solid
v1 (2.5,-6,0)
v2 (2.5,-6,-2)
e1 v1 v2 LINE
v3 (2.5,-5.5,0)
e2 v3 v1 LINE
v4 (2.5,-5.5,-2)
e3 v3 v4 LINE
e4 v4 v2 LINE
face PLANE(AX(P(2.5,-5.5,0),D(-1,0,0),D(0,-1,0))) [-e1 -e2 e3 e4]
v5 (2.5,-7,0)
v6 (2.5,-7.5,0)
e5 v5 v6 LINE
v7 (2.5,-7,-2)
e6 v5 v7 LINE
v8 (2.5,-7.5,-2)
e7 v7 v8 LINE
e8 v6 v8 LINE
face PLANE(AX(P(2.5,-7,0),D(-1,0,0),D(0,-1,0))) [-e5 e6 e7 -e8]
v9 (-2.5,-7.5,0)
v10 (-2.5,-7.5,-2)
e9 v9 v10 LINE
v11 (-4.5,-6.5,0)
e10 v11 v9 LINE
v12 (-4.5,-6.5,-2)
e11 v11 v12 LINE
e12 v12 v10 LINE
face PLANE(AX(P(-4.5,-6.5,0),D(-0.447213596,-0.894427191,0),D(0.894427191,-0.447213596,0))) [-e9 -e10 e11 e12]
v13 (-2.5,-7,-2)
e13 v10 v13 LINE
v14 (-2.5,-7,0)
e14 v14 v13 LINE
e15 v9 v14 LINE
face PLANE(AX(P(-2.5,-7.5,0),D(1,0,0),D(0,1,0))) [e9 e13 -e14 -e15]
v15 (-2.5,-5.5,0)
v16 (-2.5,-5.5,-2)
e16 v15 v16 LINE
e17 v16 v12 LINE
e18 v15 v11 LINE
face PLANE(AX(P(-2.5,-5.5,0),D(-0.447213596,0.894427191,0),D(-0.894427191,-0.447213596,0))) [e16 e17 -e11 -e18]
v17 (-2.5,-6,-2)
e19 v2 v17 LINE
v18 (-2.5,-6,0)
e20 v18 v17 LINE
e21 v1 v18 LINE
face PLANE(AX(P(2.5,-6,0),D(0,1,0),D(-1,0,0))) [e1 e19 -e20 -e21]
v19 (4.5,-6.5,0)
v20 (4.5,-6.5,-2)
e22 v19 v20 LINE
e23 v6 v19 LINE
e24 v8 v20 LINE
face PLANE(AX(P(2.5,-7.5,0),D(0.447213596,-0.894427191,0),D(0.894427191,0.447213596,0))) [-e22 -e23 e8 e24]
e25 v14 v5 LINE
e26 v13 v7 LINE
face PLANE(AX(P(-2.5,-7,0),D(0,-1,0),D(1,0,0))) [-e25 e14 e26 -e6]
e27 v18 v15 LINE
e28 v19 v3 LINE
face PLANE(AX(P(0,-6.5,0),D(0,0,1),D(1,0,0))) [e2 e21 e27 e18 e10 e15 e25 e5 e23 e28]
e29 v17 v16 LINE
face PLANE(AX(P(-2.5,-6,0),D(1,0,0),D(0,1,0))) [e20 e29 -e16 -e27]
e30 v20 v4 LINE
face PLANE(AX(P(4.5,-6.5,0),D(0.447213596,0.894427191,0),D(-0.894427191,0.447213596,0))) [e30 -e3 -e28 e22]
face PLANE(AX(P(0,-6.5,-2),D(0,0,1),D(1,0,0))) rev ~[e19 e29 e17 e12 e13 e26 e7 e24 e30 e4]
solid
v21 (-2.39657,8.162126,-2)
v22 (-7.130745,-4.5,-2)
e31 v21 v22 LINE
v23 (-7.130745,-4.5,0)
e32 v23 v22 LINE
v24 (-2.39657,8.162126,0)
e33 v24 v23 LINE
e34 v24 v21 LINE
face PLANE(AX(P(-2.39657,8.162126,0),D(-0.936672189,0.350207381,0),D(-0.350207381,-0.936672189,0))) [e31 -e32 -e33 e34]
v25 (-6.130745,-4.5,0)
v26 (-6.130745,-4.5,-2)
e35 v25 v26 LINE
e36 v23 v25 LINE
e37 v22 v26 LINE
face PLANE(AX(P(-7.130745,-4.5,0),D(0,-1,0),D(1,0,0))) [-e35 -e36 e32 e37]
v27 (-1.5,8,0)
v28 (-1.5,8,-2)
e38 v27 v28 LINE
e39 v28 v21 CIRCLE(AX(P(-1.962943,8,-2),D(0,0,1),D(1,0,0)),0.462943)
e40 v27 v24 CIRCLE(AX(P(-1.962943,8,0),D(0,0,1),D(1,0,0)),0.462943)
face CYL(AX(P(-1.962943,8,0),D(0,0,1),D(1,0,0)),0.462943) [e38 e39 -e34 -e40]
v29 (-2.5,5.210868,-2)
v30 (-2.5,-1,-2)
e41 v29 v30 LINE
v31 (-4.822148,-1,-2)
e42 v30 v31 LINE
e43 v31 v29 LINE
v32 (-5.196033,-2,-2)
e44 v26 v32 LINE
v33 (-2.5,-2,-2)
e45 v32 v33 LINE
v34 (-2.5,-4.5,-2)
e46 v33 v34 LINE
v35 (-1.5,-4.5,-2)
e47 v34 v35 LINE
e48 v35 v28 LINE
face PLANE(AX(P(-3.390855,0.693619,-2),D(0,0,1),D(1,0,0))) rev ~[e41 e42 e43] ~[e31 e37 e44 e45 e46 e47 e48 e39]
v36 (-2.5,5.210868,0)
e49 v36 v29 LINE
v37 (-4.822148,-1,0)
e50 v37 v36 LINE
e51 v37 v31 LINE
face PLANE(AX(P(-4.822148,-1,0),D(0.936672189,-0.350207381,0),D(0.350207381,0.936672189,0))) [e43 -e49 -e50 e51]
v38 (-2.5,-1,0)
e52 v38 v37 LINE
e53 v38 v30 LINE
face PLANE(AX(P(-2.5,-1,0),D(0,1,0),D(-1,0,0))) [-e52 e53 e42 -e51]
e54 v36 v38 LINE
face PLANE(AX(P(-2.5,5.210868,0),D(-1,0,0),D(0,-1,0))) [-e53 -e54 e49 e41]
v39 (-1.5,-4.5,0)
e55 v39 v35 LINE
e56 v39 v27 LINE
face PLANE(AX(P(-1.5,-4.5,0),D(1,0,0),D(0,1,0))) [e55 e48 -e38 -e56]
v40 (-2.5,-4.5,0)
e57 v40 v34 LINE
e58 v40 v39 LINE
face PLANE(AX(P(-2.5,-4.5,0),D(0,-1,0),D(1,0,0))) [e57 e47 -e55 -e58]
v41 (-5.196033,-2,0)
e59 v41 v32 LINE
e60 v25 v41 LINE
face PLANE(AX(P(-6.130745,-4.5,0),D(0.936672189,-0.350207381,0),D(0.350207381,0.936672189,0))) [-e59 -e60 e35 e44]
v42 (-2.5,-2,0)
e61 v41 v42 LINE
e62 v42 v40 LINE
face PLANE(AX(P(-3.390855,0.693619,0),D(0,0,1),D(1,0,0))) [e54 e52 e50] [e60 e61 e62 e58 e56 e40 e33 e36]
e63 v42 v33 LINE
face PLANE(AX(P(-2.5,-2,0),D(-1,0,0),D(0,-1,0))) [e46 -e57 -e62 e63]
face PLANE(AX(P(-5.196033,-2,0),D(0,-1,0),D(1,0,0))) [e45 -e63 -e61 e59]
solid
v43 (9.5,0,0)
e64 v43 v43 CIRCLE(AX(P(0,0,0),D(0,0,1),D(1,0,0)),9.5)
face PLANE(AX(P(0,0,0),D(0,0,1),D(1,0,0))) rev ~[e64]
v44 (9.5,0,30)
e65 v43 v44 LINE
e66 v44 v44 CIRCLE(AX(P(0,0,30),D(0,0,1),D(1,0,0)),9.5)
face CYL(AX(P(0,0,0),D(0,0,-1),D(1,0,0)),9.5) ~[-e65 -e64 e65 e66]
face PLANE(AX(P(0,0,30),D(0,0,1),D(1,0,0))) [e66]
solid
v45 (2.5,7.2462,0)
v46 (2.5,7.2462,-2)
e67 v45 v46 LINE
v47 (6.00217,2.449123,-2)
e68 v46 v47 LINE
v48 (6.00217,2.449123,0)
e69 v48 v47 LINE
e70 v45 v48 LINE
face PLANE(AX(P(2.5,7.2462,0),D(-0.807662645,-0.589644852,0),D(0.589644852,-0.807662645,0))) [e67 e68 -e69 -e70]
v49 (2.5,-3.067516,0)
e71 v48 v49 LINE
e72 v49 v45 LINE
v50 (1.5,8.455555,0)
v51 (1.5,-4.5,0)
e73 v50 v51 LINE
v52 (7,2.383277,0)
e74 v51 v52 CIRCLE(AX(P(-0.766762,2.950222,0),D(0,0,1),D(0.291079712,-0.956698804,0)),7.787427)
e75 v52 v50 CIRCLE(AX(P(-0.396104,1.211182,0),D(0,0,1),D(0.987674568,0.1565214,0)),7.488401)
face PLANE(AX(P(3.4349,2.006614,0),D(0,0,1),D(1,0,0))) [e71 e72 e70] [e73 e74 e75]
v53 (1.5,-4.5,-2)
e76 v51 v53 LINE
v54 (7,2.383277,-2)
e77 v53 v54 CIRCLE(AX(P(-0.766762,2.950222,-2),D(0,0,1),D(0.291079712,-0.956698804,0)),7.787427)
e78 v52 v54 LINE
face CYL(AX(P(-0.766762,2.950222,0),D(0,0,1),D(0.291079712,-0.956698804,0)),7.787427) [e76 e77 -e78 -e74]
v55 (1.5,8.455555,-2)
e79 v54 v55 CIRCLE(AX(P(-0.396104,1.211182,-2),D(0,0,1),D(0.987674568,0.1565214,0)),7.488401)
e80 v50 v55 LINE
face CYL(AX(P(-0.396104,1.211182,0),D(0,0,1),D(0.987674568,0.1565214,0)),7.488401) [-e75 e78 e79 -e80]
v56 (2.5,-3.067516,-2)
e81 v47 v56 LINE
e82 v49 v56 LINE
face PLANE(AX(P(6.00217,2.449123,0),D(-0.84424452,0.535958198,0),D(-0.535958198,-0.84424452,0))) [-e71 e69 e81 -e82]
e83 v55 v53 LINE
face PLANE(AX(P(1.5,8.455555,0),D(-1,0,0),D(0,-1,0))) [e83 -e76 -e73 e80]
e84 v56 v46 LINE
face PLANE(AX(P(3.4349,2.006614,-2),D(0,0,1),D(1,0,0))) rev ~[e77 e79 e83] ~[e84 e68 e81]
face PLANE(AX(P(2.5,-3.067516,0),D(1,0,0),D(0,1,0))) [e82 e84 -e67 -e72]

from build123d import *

# Parameters (mm, degrees)
F1_DEPTH = 2
F0_R     = 9.5
F2_DEPTH = 30


with BuildPart() as f1:
    # F0 (on Top) → F1 (new body)
    with BuildSketch(Plane.XY):
        with BuildLine():
            Line((-2.5, -4.5), (-1.5, -4.5))
            Line((-1.5, -4.5), (-1.5, 8))
            ThreePointArc((-1.5, 8), (-1.8805656371, 8.4555551787), (-2.3965696716, 8.1621262073))
            Line((-2.3965696716, 8.1621262073), (-7.1307446703, -4.5))
            Line((-7.1307446703, -4.5), (-6.1307446703, -4.5))
            Line((-6.1307446703, -4.5), (-5.1960329715, -2))
            Line((-5.1960329715, -2), (-2.5, -2))
            Line((-2.5, -2), (-2.5, -4.5))
        make_face()
        Polygon((-2.5, -1), (-4.8221482921, -1), (-2.5, 5.210867734), align=None, mode=Mode.SUBTRACT)
    extrude(amount=-F1_DEPTH)


with BuildPart() as f1b:
    # F0 (on Top) → F1, piece 2 (new body)
    with BuildSketch(Plane.XY):
        with BuildLine():
            Line((1.5, 8.4555551787), (1.5, -4.5))
            ThreePointArc((1.5, -4.5), (5.317050605, -1.9109756291), (7, 2.3832767911))
            ThreePointArc((7, 2.3832767911), (5.154069353, 6.2382818411), (1.5, 8.4555551787))
        make_face()
        Polygon((2.5, -3.0675162561), (2.5, 7.2462004609), (6.0021702136, 2.449122956), align=None, mode=Mode.SUBTRACT)
    extrude(amount=-F1_DEPTH)


with BuildPart() as f1c:
    # F0 (on Top) → F1, piece 3 (new body)
    with BuildSketch(Plane.XY):
        Polygon((2.5, -6), (-2.5, -6), (-2.5, -5.5), (-4.5, -6.5), (-2.5, -7.5), (-2.5, -7), (2.5, -7), (2.5, -7.5), (4.5, -6.5), (2.5, -5.5), align=None)
    extrude(amount=-F1_DEPTH)


with BuildPart() as f2:
    # F0 (on Top) → F2 (new body)
    with BuildSketch(Plane.XY):
        Circle(F0_R)
        Polygon((-2.5, -5.5), (-2.5, -6), (2.5, -6), (2.5, -5.5), (4.5, -6.5), (2.5, -7.5), (2.5, -7), (-2.5, -7), (-2.5, -7.5), (-4.5, -6.5), align=None, mode=Mode.SUBTRACT)
        with BuildLine():
            Line((-1.5, 8), (-1.5, -4.5))
            Line((-1.5, -4.5), (-2.5, -4.5))
            Line((-2.5, -4.5), (-2.5, -2))
            Line((-2.5, -2), (-5.1960329715, -2))
            Line((-5.1960329715, -2), (-6.1307446703, -4.5))
            Line((-6.1307446703, -4.5), (-7.1307446703, -4.5))
            Line((-7.1307446703, -4.5), (-2.3965696716, 8.1621262073))
            ThreePointArc((-2.3965696716, 8.1621262073), (-1.8805656371, 8.4555551787), (-1.5, 8))
        make_face(mode=Mode.SUBTRACT)
        with BuildLine():
            ThreePointArc((7, 2.3832767911), (5.317050605, -1.9109756291), (1.5, -4.5))
            Line((1.5, -4.5), (1.5, 8.4555551787))
            ThreePointArc((1.5, 8.4555551787), (5.154069353, 6.2382818411), (7, 2.3832767911))
        make_face(mode=Mode.SUBTRACT)
        with BuildLine():
            Line((1.5, 8.4555551787), (1.5, -4.5))
            ThreePointArc((1.5, -4.5), (5.317050605, -1.9109756291), (7, 2.3832767911))
            ThreePointArc((7, 2.3832767911), (5.154069353, 6.2382818411), (1.5, 8.4555551787))
        make_face()
        Polygon((2.5, -3.0675162561), (2.5, 7.2462004609), (6.0021702136, 2.449122956), align=None, mode=Mode.SUBTRACT)
        with BuildLine():
            Line((-2.5, -4.5), (-1.5, -4.5))
            Line((-1.5, -4.5), (-1.5, 8))
            ThreePointArc((-1.5, 8), (-1.8805656371, 8.4555551787), (-2.3965696716, 8.1621262073))
            Line((-2.3965696716, 8.1621262073), (-7.1307446703, -4.5))
            Line((-7.1307446703, -4.5), (-6.1307446703, -4.5))
            Line((-6.1307446703, -4.5), (-5.1960329715, -2))
            Line((-5.1960329715, -2), (-2.5, -2))
            Line((-2.5, -2), (-2.5, -4.5))
        make_face()
        Polygon((-2.5, -1), (-4.8221482921, -1), (-2.5, 5.210867734), align=None, mode=Mode.SUBTRACT)
        Polygon((6.0021702136, 2.449122956), (2.5, 7.2462004609), (2.5, -3.0675162561), align=None)
        Polygon((2.5, -6), (-2.5, -6), (-2.5, -5.5), (-4.5, -6.5), (-2.5, -7.5), (-2.5, -7), (2.5, -7), (2.5, -7.5), (4.5, -6.5), (2.5, -5.5), align=None)
        Polygon((-2.5, 5.210867734), (-4.8221482921, -1), (-2.5, -1), align=None)
    extrude(amount=F2_DEPTH)


solid = Compound([f1.part, f1b.part, f1c.part, f2.part])
